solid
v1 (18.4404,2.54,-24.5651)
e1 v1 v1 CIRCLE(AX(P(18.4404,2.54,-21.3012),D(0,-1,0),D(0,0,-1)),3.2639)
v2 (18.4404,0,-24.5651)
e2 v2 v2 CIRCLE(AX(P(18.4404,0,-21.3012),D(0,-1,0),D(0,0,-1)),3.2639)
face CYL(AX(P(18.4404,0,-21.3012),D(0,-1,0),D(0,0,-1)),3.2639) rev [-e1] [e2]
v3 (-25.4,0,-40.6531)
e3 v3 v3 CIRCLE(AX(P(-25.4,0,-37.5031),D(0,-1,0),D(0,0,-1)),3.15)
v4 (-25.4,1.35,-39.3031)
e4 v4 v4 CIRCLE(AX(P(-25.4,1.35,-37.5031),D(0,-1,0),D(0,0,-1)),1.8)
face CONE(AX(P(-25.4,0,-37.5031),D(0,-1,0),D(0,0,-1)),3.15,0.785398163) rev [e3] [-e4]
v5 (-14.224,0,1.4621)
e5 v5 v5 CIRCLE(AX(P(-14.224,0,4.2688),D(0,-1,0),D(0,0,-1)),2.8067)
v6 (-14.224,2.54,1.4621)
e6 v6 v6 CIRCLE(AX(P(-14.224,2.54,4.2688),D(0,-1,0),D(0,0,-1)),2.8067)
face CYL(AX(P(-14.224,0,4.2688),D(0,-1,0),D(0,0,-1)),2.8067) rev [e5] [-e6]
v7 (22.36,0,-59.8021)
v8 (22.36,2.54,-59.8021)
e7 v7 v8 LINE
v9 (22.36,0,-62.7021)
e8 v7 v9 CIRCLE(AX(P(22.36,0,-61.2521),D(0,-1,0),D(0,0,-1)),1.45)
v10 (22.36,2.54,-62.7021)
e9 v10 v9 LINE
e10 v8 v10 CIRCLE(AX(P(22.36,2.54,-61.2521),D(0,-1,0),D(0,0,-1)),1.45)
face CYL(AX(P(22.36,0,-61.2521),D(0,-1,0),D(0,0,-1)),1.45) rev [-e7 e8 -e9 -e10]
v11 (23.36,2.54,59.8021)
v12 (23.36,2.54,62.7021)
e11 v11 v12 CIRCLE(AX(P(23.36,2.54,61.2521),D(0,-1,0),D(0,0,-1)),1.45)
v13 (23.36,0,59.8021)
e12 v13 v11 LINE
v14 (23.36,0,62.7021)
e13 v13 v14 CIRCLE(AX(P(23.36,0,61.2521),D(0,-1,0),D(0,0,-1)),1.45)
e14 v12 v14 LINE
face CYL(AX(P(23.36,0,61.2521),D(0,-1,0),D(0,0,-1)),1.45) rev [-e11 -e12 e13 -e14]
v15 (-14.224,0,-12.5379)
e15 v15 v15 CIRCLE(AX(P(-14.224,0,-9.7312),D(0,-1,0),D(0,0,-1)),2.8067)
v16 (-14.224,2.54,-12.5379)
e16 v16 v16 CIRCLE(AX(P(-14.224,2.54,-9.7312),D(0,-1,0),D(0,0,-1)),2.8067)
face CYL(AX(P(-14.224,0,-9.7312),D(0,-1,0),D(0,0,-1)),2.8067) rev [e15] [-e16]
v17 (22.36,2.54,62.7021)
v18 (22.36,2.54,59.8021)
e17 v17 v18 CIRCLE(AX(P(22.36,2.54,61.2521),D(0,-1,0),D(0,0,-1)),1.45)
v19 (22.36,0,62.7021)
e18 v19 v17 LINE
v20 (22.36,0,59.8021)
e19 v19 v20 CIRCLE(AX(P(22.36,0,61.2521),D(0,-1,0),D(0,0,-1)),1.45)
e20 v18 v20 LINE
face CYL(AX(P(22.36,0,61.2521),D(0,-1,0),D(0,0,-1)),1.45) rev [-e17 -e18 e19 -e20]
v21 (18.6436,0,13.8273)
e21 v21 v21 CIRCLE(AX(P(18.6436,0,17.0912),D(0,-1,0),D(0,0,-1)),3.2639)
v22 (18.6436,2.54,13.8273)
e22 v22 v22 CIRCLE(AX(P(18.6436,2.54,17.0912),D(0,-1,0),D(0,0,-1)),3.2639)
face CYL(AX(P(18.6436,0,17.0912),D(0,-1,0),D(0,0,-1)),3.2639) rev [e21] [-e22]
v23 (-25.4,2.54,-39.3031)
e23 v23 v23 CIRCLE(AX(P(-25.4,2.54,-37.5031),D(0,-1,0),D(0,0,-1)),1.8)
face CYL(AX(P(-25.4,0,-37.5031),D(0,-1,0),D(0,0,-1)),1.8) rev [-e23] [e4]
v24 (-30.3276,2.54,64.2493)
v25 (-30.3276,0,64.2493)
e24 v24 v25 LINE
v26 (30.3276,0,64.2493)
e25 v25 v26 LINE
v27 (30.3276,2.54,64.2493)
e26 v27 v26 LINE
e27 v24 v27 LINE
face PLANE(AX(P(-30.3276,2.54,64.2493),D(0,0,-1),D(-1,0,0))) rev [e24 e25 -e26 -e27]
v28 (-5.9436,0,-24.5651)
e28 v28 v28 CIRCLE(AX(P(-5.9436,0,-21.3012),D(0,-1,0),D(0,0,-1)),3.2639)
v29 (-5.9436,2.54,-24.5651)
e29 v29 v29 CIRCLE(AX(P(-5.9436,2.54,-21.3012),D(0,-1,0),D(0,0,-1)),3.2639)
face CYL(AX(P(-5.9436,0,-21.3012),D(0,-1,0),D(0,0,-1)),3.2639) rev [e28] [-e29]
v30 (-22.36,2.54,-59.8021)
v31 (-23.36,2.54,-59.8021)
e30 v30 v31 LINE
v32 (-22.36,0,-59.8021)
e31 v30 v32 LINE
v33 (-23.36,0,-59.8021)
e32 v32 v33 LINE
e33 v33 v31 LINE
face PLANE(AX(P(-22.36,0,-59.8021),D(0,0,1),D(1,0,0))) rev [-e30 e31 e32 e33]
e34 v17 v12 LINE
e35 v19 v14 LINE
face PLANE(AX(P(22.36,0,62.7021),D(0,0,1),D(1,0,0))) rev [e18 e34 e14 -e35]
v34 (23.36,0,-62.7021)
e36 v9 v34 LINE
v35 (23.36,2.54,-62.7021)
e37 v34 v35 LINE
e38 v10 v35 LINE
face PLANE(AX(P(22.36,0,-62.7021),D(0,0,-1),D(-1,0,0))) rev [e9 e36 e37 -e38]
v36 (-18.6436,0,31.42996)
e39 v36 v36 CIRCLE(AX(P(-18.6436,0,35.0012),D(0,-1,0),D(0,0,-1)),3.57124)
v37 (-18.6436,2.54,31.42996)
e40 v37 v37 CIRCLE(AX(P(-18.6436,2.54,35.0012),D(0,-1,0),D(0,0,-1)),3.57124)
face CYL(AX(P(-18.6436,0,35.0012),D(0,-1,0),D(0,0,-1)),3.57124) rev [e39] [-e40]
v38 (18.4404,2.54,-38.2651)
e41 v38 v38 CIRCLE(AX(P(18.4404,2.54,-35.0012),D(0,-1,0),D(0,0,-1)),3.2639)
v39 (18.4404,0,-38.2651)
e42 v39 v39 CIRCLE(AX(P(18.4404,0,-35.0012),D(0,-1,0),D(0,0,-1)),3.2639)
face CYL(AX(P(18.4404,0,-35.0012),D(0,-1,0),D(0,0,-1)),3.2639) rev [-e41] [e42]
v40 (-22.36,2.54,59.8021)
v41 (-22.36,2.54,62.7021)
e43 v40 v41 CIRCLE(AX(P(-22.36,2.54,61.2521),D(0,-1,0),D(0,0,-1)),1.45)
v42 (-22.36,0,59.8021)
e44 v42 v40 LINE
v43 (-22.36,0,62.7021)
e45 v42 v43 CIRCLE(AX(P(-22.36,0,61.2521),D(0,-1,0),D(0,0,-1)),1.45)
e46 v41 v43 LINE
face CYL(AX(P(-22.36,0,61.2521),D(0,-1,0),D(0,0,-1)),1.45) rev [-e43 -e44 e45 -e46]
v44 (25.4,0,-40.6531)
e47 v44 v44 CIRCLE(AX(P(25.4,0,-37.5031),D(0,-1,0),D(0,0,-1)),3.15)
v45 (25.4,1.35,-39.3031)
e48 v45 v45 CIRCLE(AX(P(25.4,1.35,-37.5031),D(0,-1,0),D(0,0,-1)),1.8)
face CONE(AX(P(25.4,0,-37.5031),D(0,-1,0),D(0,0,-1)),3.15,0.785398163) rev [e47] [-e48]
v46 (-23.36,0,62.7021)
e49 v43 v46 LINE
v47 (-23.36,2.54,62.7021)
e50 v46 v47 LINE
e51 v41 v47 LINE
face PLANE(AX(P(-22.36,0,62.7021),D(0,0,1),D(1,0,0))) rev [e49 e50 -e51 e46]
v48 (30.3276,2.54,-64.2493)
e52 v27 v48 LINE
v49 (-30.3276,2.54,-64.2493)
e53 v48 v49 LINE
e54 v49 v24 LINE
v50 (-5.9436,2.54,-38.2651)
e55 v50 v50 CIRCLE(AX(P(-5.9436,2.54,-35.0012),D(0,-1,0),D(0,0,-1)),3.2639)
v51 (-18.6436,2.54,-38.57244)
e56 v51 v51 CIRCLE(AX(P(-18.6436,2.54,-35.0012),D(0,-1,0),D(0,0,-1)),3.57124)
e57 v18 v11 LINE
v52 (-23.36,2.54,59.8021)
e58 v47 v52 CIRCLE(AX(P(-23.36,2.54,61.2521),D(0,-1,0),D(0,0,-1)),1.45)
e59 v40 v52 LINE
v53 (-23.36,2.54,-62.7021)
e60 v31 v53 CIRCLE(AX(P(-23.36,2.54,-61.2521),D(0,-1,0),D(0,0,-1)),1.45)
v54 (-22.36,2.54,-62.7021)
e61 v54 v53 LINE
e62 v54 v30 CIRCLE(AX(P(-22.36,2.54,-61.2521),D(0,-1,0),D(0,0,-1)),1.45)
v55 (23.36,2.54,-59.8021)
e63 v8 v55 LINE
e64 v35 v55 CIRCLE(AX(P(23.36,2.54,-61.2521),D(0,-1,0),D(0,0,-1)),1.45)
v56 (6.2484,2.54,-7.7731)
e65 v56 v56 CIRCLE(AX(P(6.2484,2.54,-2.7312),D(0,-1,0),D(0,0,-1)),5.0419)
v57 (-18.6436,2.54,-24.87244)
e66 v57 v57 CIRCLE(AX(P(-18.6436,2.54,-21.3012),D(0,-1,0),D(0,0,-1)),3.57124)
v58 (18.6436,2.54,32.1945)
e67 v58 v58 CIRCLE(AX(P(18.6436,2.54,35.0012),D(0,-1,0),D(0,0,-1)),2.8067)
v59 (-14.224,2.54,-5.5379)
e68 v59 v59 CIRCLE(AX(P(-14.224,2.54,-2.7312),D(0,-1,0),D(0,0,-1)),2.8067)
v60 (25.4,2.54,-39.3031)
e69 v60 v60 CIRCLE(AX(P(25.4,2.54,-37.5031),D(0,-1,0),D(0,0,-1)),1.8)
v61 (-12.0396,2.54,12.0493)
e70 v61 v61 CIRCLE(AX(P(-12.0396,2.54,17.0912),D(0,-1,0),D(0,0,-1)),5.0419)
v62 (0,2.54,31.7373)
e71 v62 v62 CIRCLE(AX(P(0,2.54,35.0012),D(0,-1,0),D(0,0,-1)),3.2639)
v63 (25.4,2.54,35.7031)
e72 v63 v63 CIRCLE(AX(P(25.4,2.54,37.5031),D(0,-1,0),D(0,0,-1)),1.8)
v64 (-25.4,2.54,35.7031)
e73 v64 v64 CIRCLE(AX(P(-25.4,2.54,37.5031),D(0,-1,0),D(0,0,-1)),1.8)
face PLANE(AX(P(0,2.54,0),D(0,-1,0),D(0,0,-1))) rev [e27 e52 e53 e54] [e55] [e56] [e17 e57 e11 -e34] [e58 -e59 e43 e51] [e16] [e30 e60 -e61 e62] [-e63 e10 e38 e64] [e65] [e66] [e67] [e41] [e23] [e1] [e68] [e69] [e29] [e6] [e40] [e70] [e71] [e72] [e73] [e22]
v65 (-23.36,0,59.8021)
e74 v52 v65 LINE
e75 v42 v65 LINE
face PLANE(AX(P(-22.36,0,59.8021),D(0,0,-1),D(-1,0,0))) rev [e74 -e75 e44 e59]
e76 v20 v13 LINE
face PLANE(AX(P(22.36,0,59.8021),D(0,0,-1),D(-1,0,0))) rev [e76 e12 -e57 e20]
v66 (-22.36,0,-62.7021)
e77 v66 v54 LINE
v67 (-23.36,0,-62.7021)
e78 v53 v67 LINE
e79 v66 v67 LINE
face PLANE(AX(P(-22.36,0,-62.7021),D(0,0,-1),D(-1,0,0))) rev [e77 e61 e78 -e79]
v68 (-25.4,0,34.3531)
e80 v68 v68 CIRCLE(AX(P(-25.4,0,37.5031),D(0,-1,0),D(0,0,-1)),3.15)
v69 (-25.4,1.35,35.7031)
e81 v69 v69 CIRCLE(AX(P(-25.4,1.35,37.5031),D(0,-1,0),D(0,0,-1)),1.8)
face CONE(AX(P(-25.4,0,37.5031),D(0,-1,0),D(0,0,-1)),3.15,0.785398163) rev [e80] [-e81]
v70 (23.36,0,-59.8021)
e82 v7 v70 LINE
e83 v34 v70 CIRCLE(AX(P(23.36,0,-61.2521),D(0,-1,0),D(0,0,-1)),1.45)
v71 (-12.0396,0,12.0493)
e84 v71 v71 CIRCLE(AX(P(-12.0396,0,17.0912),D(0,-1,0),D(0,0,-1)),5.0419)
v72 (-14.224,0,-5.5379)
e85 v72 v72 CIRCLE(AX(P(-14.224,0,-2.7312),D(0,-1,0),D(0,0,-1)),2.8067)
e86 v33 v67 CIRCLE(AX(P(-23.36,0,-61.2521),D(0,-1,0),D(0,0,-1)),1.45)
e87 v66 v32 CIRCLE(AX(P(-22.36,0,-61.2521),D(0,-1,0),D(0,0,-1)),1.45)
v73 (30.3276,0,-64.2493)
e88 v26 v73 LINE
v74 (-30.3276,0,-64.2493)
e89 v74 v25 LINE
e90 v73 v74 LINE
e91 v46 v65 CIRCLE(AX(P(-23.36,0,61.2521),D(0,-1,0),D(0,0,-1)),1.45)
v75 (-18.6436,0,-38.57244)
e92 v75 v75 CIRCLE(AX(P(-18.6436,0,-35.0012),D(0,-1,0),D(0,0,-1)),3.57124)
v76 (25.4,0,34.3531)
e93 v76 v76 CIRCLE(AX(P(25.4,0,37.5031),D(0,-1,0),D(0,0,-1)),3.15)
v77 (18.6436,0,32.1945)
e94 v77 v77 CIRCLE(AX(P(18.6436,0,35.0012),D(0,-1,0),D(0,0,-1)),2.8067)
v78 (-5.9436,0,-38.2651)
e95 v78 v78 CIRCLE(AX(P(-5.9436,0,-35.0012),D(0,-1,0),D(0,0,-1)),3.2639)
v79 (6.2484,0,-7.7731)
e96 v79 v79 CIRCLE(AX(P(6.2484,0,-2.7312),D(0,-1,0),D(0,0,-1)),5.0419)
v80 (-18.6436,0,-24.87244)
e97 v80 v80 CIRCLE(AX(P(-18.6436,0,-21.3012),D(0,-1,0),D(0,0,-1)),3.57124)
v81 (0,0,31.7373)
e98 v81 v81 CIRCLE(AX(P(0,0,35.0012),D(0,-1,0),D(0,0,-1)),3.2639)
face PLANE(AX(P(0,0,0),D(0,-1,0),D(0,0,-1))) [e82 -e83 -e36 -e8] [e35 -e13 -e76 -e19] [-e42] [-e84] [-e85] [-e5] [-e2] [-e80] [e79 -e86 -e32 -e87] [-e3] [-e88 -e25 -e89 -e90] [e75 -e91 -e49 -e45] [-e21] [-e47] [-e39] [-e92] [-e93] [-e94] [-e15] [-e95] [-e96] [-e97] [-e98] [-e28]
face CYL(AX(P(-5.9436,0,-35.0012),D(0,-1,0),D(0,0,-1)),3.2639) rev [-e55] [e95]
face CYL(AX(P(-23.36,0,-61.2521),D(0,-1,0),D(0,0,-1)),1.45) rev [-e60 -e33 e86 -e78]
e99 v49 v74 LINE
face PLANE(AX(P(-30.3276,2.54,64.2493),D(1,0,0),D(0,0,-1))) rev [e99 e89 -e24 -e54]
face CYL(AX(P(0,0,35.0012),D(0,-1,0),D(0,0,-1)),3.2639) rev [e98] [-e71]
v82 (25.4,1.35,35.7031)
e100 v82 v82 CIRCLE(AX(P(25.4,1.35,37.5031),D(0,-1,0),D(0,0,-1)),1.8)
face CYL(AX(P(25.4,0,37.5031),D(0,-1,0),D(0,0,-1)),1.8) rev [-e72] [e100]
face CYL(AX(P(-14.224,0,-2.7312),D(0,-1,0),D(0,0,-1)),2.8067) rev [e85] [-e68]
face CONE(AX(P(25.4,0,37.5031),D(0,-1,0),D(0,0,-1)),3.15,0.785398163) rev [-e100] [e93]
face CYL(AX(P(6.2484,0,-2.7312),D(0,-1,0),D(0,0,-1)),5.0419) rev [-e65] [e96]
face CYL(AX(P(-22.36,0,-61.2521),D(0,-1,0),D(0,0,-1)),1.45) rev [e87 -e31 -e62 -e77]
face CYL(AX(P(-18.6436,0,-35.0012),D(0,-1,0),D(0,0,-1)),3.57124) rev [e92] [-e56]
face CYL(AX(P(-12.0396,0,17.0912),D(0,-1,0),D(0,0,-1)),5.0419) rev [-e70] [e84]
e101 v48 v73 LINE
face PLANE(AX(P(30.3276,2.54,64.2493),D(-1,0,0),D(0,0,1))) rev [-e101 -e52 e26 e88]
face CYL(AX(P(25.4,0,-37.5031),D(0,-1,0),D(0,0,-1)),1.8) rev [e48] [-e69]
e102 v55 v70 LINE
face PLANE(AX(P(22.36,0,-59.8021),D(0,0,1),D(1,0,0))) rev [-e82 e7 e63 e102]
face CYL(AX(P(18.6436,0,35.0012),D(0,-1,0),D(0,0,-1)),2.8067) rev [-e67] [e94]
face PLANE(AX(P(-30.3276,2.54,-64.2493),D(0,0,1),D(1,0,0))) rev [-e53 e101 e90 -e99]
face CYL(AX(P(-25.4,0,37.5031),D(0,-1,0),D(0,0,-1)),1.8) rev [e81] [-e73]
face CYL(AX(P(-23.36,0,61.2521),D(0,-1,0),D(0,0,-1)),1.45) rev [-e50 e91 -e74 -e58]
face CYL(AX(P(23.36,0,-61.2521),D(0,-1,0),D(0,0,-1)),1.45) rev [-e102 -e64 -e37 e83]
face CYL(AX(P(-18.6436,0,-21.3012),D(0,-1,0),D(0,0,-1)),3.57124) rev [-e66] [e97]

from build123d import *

# Parameters (mm, degrees)
SKETCH1_W                                      = 60.6552
SKETCH1_H                                      = 128.4986
BOSS_EXTRUDE1_DEPTH                            = 2.54
CSK_FOR_M3_FLAT_HEAD_MACHINE_SCREW1_AT_2_COUNT = 2
CSK_FOR_M3_FLAT_HEAD_MACHINE_SCREW1_AT_2_PITCH = 75.0062
M2_5_CLEARANCE_SLOT1_DEPTH                     = 2.54
F_1_4_CLEARANCE_HOLE1_D                        = 7.14248
F_1_4_CLEARANCE_HOLE2_D                        = 6.5278
F_3_8_CLEARANCE_HOLE2_D                        = 10.0838
F_10_CLEARANCE_HOLE1_D                         = 5.6134


# Read off the part's stored shape, not the designer's step: M2.5 Clearance Slot1
with BuildPart() as part:
    # Sketch1 → Boss-Extrude1 (new body)
    with BuildSketch(Plane(origin=(0, 0, 0), x_dir=(1, 0, 0), z_dir=(0, 1, 0))):
        Rectangle(SKETCH1_W, SKETCH1_H)
    extrude(amount=BOSS_EXTRUDE1_DEPTH)

    # Sketch5 → CSK for M3 Flat Head Machine Screw1 (revolve, cut)
    with BuildSketch(Plane(origin=(25.4, 0, -37.5031), x_dir=(0, 0, -1), z_dir=(1, 0, 0))):
        Polygon((0, 0), (0, 2.54), (1.8, 2.54), (1.8, 1.35), (3.15, 0), align=None)
    csk_for_m3_flat_head_machine_screw1 = revolve(axis=Axis((25.4, -6.35, -37.5031), (0, 1, 0)), mode=Mode.SUBTRACT)

    # CSK for M3 Flat Head Machine Screw1 at 2: CSK for M3 Flat Head Machine Screw1 ×2
    with Locations(*[(0, 0, i * CSK_FOR_M3_FLAT_HEAD_MACHINE_SCREW1_AT_2_PITCH) for i in range(1, CSK_FOR_M3_FLAT_HEAD_MACHINE_SCREW1_AT_2_COUNT)]):
        add(csk_for_m3_flat_head_machine_screw1, mode=Mode.SUBTRACT)

    # M2.5 Clearance Slot1 outline → M2.5 Clearance Slot1 (cut)
    with BuildSketch(Plane(origin=(0, 0, 0), x_dir=(1, 0, 0), z_dir=(0, 1, 0))):
        with BuildLine():
            ThreePointArc((23.36, -62.7021), (24.81, -61.2521), (23.36, -59.8021))
            Line((23.36, -59.8021), (22.36, -59.8021))
            ThreePointArc((22.36, -59.8021), (20.91, -61.2521), (22.36, -62.7021))
            Line((22.36, -62.7021), (23.36, -62.7021))
        make_face()
        with BuildLine():
            ThreePointArc((23.36, 59.8021), (24.81, 61.2521), (23.36, 62.7021))
            Line((23.36, 62.7021), (22.36, 62.7021))
            ThreePointArc((22.36, 62.7021), (20.91, 61.2521), (22.36, 59.8021))
            Line((22.36, 59.8021), (23.36, 59.8021))
        make_face()
    m2_5_clearance_slot1 = extrude(amount=M2_5_CLEARANCE_SLOT1_DEPTH, mode=Mode.SUBTRACT)

    # Mirror1: CSK for M3 Flat Head Machine Screw1, M2.5 Clearance Slot1 across plane
    add(csk_for_m3_flat_head_machine_screw1.mirror(Plane(origin=(0, 0, 0), x_dir=(0, 0, 1), z_dir=(1, 0, 0))), mode=Mode.SUBTRACT)
    add(m2_5_clearance_slot1.mirror(Plane(origin=(0, 0, 0), x_dir=(0, 0, 1), z_dir=(1, 0, 0))), mode=Mode.SUBTRACT)

    # Mirror1 copy 1 sketch → Mirror1 copy 1 (revolve, cut)
    with BuildSketch(Plane(origin=(-25.4, 0, 37.5031), x_dir=(0, 0, -1), z_dir=(-1, 0, 0))):
        Polygon((0, 0), (0, -2.54), (1.8, -2.54), (1.8, -1.35), (3.15, 0), align=None)
    revolve(axis=Axis((-25.4, -6.35, 37.5031), (0, -1, 0)), mode=Mode.SUBTRACT)

    # 1/4 Clearance Hole1 (through all)
    with Locations(Plane(origin=(0, 0, 0), x_dir=(-1, 0, 0), z_dir=(0, -1, 0))):
        with Locations((18.6436, 35.0012), (18.6436, 21.301199968), (18.6436, -35.0012)):
            Hole(F_1_4_CLEARANCE_HOLE1_D / 2)

    # 1/4 Clearance Hole2 (through all)
    with Locations(Plane(origin=(0, 0, 0), x_dir=(-1, 0, 0), z_dir=(0, -1, 0))):
        with Locations((-18.4404, 35.0012), (5.9436, 35.0012), (5.9436, 21.301199968), (-18.4404, 21.301199968), (-18.6436, -17.091200006), (0, -35.0012)):
            Hole(F_1_4_CLEARANCE_HOLE2_D / 2)

    # 3/8 Clearance Hole2 (through all)
    with Locations(Plane(origin=(0, 0, 0), x_dir=(-1, 0, 0), z_dir=(0, -1, 0))):
        with Locations((12.0396, -17.091200006), (-6.2484, 2.731200024)):
            Hole(F_3_8_CLEARANCE_HOLE2_D / 2)

    # #10 Clearance Hole1 (through all)
    with Locations(Plane(origin=(0, 0, 0), x_dir=(-1, 0, 0), z_dir=(0, -1, 0))):
        with Locations((14.224, -4.268799946), (14.224, 2.731200024), (14.224, 9.731199994), (-18.6436, -35.0012)):
            Hole(F_10_CLEARANCE_HOLE1_D / 2)


solid = part.part
